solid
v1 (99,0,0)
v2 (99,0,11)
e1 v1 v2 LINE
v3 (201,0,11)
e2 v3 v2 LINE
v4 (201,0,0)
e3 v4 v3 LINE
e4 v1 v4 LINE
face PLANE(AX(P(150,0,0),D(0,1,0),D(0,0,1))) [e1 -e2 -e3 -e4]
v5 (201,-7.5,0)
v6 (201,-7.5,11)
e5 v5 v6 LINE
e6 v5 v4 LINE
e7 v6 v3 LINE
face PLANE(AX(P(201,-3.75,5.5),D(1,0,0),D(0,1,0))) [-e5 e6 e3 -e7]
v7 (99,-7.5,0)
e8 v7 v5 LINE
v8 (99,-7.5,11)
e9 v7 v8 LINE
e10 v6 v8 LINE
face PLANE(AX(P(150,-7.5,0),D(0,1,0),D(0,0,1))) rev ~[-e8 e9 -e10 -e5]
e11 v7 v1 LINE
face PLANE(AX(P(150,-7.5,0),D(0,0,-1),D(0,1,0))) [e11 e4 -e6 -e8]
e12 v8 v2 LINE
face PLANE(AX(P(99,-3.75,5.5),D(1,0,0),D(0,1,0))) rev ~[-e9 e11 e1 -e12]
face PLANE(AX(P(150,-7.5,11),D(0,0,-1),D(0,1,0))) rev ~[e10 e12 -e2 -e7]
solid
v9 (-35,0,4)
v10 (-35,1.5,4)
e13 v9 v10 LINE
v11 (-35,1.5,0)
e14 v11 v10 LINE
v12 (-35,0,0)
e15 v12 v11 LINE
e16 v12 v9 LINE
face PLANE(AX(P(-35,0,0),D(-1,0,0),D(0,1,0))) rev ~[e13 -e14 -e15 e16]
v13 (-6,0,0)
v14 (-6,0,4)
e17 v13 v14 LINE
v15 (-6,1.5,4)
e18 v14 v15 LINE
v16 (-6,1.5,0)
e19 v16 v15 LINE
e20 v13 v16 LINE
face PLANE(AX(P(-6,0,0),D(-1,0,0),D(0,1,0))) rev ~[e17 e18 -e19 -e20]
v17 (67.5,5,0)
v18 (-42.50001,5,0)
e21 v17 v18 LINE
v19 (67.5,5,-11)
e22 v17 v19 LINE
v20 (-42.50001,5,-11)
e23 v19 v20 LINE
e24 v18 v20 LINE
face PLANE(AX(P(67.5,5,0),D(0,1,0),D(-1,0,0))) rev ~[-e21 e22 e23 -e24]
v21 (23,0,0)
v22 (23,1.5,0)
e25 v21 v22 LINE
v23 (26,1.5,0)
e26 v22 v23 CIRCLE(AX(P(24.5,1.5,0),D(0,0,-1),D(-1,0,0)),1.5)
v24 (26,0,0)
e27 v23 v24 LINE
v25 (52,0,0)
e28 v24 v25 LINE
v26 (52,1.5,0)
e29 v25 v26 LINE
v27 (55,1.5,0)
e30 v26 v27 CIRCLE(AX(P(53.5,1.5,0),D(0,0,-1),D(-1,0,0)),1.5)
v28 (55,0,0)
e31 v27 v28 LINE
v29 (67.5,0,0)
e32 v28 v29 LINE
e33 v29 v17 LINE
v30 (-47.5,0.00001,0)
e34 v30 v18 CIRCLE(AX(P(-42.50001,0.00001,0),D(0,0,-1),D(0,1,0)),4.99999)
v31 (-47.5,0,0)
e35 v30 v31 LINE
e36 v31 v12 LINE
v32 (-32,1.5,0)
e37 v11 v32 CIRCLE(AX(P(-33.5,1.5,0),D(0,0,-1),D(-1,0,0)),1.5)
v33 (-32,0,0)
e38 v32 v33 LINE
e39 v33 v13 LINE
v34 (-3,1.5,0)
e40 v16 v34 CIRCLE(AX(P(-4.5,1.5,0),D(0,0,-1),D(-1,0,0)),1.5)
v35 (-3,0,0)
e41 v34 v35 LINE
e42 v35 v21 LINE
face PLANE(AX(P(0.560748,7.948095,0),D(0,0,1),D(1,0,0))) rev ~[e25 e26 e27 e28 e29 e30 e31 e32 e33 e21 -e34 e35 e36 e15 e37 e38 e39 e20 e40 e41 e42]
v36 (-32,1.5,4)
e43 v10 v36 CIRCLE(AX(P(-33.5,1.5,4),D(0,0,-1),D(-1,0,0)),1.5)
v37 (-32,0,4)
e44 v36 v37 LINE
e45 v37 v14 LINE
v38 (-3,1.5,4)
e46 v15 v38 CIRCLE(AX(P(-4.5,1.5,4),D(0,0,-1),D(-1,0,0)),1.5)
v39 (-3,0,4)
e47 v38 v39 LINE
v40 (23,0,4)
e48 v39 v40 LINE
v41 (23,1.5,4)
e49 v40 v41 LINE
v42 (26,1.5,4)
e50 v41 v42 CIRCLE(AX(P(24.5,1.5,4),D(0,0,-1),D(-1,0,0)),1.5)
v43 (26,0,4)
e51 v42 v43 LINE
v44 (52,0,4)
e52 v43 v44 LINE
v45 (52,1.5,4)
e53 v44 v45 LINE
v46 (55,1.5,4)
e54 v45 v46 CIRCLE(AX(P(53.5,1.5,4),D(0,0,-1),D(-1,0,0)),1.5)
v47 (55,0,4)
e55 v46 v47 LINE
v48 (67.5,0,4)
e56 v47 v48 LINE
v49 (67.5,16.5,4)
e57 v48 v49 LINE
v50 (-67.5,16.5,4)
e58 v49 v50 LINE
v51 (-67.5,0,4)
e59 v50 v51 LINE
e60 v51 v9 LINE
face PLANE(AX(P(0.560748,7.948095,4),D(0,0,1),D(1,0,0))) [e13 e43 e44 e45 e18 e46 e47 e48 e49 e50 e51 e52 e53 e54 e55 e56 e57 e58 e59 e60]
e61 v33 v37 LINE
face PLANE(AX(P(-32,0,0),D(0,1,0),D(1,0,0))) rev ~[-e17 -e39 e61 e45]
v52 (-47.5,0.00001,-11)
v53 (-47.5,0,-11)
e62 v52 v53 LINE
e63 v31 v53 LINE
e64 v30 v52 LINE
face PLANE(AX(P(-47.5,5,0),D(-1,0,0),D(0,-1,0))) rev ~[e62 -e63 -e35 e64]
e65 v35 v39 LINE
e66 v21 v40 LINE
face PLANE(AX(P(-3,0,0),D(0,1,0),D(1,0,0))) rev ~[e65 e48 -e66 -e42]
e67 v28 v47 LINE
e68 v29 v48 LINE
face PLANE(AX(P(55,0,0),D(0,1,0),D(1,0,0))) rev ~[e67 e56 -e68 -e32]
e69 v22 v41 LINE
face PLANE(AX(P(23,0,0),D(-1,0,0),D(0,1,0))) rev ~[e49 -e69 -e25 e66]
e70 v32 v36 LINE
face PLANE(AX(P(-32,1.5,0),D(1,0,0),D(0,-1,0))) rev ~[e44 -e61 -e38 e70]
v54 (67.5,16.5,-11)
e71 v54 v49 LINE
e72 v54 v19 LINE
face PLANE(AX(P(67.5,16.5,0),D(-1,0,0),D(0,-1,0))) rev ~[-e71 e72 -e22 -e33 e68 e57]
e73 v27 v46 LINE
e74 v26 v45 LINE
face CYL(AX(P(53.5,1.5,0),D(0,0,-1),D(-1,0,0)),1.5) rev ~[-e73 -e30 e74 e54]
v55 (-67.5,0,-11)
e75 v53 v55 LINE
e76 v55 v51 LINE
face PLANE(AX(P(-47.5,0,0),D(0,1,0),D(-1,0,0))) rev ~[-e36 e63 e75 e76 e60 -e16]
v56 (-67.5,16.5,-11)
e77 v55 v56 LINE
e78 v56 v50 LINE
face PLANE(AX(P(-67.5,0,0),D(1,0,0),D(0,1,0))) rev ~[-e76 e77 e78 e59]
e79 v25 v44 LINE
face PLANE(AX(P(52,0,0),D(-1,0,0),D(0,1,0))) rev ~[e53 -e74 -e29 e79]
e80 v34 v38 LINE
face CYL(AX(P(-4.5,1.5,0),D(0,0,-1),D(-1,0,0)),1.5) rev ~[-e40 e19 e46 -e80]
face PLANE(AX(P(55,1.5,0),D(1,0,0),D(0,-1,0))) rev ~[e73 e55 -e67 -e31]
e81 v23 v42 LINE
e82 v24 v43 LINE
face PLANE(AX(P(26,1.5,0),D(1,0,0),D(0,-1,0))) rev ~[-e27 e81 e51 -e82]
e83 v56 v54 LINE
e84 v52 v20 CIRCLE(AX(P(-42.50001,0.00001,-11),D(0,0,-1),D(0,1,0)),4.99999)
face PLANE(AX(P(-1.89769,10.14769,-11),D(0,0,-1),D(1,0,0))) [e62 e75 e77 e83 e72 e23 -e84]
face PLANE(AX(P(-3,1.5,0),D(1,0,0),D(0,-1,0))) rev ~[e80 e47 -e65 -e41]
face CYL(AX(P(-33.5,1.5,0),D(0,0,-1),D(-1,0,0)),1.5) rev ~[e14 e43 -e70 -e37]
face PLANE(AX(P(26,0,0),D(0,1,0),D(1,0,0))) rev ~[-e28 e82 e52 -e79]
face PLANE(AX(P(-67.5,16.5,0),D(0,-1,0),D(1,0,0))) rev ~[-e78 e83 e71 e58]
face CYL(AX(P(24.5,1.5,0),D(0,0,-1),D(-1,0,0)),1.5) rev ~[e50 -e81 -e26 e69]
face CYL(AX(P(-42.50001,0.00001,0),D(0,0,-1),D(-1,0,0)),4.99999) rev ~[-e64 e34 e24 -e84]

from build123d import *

# Parameters (mm, degrees)
F1_DEPTH = 4
F3_DEPTH = 11
F5_W     = 7.5
F5_H     = 11
F6_DEPTH = 51
F7_R     = 4.99999


# Not quite as in the source:
# - a fillet or chamfer is up to 0.001 mm smaller than in the source, because OpenCascade refuses the exact size


with BuildPart() as f1:
    # F0 (on Top) → F1 (new body)
    with BuildSketch(Plane.XY):
        with BuildLine():
            Line((55, 0), (67.5, 0))
            Line((67.5, 0), (67.5, 16.5))
            Line((67.5, 16.5), (-67.5, 16.5))
            Line((-67.5, 16.5), (-67.5, 0))
            Line((-67.5, 0), (-35, 0))
            Line((-35, 0), (-35, 1.5))
            ThreePointArc((-35, 1.5), (-33.5, 3), (-32, 1.5))
            Line((-32, 1.5), (-32, 0))
            Line((-32, 0), (-6, 0))
            Line((-6, 0), (-6, 1.5))
            ThreePointArc((-6, 1.5), (-4.5, 3), (-3, 1.5))
            Line((-3, 1.5), (-3, 0))
            Line((-3, 0), (23, 0))
            Line((23, 0), (23, 1.5))
            ThreePointArc((23, 1.5), (24.5, 3), (26, 1.5))
            Line((26, 1.5), (26, 0))
            Line((26, 0), (52, 0))
            Line((52, 0), (52, 1.5))
            ThreePointArc((52, 1.5), (53.5, 3), (55, 1.5))
            Line((55, 1.5), (55, 0))
        make_face()
    extrude(amount=F1_DEPTH)

    # F2 (on face) → F3 (join)
    with BuildSketch(Plane(origin=(0, 0, 0), x_dir=(1, 0, 0), z_dir=(0, 0, -1))):
        Polygon((67.5, -16.5), (67.5, -4.9999998882), (-47.5, -4.9999998882), (-47.5, 0), (-67.5, 0), (-67.5, -16.5), align=None)
    extrude(amount=F3_DEPTH)

    # F7 (radius 5 in the source; OpenCascade refuses exactly that, so slightly less here)
    f7_edges = [f1.edges().sort_by_distance(p)[0] for p in [
        (-47.5, 5, -5.5),
    ]]
    fillet(f7_edges, radius=F7_R)


with BuildPart() as f6:
    # F5 (on offset) → F6 (new body, symmetric)
    with BuildSketch(Plane.YZ.offset(150)):
        with Locations((-3.75, 5.5)):
            Rectangle(F5_W, F5_H)
    extrude(amount=F6_DEPTH, both=True)


solid = Compound([f1.part, f6.part])
